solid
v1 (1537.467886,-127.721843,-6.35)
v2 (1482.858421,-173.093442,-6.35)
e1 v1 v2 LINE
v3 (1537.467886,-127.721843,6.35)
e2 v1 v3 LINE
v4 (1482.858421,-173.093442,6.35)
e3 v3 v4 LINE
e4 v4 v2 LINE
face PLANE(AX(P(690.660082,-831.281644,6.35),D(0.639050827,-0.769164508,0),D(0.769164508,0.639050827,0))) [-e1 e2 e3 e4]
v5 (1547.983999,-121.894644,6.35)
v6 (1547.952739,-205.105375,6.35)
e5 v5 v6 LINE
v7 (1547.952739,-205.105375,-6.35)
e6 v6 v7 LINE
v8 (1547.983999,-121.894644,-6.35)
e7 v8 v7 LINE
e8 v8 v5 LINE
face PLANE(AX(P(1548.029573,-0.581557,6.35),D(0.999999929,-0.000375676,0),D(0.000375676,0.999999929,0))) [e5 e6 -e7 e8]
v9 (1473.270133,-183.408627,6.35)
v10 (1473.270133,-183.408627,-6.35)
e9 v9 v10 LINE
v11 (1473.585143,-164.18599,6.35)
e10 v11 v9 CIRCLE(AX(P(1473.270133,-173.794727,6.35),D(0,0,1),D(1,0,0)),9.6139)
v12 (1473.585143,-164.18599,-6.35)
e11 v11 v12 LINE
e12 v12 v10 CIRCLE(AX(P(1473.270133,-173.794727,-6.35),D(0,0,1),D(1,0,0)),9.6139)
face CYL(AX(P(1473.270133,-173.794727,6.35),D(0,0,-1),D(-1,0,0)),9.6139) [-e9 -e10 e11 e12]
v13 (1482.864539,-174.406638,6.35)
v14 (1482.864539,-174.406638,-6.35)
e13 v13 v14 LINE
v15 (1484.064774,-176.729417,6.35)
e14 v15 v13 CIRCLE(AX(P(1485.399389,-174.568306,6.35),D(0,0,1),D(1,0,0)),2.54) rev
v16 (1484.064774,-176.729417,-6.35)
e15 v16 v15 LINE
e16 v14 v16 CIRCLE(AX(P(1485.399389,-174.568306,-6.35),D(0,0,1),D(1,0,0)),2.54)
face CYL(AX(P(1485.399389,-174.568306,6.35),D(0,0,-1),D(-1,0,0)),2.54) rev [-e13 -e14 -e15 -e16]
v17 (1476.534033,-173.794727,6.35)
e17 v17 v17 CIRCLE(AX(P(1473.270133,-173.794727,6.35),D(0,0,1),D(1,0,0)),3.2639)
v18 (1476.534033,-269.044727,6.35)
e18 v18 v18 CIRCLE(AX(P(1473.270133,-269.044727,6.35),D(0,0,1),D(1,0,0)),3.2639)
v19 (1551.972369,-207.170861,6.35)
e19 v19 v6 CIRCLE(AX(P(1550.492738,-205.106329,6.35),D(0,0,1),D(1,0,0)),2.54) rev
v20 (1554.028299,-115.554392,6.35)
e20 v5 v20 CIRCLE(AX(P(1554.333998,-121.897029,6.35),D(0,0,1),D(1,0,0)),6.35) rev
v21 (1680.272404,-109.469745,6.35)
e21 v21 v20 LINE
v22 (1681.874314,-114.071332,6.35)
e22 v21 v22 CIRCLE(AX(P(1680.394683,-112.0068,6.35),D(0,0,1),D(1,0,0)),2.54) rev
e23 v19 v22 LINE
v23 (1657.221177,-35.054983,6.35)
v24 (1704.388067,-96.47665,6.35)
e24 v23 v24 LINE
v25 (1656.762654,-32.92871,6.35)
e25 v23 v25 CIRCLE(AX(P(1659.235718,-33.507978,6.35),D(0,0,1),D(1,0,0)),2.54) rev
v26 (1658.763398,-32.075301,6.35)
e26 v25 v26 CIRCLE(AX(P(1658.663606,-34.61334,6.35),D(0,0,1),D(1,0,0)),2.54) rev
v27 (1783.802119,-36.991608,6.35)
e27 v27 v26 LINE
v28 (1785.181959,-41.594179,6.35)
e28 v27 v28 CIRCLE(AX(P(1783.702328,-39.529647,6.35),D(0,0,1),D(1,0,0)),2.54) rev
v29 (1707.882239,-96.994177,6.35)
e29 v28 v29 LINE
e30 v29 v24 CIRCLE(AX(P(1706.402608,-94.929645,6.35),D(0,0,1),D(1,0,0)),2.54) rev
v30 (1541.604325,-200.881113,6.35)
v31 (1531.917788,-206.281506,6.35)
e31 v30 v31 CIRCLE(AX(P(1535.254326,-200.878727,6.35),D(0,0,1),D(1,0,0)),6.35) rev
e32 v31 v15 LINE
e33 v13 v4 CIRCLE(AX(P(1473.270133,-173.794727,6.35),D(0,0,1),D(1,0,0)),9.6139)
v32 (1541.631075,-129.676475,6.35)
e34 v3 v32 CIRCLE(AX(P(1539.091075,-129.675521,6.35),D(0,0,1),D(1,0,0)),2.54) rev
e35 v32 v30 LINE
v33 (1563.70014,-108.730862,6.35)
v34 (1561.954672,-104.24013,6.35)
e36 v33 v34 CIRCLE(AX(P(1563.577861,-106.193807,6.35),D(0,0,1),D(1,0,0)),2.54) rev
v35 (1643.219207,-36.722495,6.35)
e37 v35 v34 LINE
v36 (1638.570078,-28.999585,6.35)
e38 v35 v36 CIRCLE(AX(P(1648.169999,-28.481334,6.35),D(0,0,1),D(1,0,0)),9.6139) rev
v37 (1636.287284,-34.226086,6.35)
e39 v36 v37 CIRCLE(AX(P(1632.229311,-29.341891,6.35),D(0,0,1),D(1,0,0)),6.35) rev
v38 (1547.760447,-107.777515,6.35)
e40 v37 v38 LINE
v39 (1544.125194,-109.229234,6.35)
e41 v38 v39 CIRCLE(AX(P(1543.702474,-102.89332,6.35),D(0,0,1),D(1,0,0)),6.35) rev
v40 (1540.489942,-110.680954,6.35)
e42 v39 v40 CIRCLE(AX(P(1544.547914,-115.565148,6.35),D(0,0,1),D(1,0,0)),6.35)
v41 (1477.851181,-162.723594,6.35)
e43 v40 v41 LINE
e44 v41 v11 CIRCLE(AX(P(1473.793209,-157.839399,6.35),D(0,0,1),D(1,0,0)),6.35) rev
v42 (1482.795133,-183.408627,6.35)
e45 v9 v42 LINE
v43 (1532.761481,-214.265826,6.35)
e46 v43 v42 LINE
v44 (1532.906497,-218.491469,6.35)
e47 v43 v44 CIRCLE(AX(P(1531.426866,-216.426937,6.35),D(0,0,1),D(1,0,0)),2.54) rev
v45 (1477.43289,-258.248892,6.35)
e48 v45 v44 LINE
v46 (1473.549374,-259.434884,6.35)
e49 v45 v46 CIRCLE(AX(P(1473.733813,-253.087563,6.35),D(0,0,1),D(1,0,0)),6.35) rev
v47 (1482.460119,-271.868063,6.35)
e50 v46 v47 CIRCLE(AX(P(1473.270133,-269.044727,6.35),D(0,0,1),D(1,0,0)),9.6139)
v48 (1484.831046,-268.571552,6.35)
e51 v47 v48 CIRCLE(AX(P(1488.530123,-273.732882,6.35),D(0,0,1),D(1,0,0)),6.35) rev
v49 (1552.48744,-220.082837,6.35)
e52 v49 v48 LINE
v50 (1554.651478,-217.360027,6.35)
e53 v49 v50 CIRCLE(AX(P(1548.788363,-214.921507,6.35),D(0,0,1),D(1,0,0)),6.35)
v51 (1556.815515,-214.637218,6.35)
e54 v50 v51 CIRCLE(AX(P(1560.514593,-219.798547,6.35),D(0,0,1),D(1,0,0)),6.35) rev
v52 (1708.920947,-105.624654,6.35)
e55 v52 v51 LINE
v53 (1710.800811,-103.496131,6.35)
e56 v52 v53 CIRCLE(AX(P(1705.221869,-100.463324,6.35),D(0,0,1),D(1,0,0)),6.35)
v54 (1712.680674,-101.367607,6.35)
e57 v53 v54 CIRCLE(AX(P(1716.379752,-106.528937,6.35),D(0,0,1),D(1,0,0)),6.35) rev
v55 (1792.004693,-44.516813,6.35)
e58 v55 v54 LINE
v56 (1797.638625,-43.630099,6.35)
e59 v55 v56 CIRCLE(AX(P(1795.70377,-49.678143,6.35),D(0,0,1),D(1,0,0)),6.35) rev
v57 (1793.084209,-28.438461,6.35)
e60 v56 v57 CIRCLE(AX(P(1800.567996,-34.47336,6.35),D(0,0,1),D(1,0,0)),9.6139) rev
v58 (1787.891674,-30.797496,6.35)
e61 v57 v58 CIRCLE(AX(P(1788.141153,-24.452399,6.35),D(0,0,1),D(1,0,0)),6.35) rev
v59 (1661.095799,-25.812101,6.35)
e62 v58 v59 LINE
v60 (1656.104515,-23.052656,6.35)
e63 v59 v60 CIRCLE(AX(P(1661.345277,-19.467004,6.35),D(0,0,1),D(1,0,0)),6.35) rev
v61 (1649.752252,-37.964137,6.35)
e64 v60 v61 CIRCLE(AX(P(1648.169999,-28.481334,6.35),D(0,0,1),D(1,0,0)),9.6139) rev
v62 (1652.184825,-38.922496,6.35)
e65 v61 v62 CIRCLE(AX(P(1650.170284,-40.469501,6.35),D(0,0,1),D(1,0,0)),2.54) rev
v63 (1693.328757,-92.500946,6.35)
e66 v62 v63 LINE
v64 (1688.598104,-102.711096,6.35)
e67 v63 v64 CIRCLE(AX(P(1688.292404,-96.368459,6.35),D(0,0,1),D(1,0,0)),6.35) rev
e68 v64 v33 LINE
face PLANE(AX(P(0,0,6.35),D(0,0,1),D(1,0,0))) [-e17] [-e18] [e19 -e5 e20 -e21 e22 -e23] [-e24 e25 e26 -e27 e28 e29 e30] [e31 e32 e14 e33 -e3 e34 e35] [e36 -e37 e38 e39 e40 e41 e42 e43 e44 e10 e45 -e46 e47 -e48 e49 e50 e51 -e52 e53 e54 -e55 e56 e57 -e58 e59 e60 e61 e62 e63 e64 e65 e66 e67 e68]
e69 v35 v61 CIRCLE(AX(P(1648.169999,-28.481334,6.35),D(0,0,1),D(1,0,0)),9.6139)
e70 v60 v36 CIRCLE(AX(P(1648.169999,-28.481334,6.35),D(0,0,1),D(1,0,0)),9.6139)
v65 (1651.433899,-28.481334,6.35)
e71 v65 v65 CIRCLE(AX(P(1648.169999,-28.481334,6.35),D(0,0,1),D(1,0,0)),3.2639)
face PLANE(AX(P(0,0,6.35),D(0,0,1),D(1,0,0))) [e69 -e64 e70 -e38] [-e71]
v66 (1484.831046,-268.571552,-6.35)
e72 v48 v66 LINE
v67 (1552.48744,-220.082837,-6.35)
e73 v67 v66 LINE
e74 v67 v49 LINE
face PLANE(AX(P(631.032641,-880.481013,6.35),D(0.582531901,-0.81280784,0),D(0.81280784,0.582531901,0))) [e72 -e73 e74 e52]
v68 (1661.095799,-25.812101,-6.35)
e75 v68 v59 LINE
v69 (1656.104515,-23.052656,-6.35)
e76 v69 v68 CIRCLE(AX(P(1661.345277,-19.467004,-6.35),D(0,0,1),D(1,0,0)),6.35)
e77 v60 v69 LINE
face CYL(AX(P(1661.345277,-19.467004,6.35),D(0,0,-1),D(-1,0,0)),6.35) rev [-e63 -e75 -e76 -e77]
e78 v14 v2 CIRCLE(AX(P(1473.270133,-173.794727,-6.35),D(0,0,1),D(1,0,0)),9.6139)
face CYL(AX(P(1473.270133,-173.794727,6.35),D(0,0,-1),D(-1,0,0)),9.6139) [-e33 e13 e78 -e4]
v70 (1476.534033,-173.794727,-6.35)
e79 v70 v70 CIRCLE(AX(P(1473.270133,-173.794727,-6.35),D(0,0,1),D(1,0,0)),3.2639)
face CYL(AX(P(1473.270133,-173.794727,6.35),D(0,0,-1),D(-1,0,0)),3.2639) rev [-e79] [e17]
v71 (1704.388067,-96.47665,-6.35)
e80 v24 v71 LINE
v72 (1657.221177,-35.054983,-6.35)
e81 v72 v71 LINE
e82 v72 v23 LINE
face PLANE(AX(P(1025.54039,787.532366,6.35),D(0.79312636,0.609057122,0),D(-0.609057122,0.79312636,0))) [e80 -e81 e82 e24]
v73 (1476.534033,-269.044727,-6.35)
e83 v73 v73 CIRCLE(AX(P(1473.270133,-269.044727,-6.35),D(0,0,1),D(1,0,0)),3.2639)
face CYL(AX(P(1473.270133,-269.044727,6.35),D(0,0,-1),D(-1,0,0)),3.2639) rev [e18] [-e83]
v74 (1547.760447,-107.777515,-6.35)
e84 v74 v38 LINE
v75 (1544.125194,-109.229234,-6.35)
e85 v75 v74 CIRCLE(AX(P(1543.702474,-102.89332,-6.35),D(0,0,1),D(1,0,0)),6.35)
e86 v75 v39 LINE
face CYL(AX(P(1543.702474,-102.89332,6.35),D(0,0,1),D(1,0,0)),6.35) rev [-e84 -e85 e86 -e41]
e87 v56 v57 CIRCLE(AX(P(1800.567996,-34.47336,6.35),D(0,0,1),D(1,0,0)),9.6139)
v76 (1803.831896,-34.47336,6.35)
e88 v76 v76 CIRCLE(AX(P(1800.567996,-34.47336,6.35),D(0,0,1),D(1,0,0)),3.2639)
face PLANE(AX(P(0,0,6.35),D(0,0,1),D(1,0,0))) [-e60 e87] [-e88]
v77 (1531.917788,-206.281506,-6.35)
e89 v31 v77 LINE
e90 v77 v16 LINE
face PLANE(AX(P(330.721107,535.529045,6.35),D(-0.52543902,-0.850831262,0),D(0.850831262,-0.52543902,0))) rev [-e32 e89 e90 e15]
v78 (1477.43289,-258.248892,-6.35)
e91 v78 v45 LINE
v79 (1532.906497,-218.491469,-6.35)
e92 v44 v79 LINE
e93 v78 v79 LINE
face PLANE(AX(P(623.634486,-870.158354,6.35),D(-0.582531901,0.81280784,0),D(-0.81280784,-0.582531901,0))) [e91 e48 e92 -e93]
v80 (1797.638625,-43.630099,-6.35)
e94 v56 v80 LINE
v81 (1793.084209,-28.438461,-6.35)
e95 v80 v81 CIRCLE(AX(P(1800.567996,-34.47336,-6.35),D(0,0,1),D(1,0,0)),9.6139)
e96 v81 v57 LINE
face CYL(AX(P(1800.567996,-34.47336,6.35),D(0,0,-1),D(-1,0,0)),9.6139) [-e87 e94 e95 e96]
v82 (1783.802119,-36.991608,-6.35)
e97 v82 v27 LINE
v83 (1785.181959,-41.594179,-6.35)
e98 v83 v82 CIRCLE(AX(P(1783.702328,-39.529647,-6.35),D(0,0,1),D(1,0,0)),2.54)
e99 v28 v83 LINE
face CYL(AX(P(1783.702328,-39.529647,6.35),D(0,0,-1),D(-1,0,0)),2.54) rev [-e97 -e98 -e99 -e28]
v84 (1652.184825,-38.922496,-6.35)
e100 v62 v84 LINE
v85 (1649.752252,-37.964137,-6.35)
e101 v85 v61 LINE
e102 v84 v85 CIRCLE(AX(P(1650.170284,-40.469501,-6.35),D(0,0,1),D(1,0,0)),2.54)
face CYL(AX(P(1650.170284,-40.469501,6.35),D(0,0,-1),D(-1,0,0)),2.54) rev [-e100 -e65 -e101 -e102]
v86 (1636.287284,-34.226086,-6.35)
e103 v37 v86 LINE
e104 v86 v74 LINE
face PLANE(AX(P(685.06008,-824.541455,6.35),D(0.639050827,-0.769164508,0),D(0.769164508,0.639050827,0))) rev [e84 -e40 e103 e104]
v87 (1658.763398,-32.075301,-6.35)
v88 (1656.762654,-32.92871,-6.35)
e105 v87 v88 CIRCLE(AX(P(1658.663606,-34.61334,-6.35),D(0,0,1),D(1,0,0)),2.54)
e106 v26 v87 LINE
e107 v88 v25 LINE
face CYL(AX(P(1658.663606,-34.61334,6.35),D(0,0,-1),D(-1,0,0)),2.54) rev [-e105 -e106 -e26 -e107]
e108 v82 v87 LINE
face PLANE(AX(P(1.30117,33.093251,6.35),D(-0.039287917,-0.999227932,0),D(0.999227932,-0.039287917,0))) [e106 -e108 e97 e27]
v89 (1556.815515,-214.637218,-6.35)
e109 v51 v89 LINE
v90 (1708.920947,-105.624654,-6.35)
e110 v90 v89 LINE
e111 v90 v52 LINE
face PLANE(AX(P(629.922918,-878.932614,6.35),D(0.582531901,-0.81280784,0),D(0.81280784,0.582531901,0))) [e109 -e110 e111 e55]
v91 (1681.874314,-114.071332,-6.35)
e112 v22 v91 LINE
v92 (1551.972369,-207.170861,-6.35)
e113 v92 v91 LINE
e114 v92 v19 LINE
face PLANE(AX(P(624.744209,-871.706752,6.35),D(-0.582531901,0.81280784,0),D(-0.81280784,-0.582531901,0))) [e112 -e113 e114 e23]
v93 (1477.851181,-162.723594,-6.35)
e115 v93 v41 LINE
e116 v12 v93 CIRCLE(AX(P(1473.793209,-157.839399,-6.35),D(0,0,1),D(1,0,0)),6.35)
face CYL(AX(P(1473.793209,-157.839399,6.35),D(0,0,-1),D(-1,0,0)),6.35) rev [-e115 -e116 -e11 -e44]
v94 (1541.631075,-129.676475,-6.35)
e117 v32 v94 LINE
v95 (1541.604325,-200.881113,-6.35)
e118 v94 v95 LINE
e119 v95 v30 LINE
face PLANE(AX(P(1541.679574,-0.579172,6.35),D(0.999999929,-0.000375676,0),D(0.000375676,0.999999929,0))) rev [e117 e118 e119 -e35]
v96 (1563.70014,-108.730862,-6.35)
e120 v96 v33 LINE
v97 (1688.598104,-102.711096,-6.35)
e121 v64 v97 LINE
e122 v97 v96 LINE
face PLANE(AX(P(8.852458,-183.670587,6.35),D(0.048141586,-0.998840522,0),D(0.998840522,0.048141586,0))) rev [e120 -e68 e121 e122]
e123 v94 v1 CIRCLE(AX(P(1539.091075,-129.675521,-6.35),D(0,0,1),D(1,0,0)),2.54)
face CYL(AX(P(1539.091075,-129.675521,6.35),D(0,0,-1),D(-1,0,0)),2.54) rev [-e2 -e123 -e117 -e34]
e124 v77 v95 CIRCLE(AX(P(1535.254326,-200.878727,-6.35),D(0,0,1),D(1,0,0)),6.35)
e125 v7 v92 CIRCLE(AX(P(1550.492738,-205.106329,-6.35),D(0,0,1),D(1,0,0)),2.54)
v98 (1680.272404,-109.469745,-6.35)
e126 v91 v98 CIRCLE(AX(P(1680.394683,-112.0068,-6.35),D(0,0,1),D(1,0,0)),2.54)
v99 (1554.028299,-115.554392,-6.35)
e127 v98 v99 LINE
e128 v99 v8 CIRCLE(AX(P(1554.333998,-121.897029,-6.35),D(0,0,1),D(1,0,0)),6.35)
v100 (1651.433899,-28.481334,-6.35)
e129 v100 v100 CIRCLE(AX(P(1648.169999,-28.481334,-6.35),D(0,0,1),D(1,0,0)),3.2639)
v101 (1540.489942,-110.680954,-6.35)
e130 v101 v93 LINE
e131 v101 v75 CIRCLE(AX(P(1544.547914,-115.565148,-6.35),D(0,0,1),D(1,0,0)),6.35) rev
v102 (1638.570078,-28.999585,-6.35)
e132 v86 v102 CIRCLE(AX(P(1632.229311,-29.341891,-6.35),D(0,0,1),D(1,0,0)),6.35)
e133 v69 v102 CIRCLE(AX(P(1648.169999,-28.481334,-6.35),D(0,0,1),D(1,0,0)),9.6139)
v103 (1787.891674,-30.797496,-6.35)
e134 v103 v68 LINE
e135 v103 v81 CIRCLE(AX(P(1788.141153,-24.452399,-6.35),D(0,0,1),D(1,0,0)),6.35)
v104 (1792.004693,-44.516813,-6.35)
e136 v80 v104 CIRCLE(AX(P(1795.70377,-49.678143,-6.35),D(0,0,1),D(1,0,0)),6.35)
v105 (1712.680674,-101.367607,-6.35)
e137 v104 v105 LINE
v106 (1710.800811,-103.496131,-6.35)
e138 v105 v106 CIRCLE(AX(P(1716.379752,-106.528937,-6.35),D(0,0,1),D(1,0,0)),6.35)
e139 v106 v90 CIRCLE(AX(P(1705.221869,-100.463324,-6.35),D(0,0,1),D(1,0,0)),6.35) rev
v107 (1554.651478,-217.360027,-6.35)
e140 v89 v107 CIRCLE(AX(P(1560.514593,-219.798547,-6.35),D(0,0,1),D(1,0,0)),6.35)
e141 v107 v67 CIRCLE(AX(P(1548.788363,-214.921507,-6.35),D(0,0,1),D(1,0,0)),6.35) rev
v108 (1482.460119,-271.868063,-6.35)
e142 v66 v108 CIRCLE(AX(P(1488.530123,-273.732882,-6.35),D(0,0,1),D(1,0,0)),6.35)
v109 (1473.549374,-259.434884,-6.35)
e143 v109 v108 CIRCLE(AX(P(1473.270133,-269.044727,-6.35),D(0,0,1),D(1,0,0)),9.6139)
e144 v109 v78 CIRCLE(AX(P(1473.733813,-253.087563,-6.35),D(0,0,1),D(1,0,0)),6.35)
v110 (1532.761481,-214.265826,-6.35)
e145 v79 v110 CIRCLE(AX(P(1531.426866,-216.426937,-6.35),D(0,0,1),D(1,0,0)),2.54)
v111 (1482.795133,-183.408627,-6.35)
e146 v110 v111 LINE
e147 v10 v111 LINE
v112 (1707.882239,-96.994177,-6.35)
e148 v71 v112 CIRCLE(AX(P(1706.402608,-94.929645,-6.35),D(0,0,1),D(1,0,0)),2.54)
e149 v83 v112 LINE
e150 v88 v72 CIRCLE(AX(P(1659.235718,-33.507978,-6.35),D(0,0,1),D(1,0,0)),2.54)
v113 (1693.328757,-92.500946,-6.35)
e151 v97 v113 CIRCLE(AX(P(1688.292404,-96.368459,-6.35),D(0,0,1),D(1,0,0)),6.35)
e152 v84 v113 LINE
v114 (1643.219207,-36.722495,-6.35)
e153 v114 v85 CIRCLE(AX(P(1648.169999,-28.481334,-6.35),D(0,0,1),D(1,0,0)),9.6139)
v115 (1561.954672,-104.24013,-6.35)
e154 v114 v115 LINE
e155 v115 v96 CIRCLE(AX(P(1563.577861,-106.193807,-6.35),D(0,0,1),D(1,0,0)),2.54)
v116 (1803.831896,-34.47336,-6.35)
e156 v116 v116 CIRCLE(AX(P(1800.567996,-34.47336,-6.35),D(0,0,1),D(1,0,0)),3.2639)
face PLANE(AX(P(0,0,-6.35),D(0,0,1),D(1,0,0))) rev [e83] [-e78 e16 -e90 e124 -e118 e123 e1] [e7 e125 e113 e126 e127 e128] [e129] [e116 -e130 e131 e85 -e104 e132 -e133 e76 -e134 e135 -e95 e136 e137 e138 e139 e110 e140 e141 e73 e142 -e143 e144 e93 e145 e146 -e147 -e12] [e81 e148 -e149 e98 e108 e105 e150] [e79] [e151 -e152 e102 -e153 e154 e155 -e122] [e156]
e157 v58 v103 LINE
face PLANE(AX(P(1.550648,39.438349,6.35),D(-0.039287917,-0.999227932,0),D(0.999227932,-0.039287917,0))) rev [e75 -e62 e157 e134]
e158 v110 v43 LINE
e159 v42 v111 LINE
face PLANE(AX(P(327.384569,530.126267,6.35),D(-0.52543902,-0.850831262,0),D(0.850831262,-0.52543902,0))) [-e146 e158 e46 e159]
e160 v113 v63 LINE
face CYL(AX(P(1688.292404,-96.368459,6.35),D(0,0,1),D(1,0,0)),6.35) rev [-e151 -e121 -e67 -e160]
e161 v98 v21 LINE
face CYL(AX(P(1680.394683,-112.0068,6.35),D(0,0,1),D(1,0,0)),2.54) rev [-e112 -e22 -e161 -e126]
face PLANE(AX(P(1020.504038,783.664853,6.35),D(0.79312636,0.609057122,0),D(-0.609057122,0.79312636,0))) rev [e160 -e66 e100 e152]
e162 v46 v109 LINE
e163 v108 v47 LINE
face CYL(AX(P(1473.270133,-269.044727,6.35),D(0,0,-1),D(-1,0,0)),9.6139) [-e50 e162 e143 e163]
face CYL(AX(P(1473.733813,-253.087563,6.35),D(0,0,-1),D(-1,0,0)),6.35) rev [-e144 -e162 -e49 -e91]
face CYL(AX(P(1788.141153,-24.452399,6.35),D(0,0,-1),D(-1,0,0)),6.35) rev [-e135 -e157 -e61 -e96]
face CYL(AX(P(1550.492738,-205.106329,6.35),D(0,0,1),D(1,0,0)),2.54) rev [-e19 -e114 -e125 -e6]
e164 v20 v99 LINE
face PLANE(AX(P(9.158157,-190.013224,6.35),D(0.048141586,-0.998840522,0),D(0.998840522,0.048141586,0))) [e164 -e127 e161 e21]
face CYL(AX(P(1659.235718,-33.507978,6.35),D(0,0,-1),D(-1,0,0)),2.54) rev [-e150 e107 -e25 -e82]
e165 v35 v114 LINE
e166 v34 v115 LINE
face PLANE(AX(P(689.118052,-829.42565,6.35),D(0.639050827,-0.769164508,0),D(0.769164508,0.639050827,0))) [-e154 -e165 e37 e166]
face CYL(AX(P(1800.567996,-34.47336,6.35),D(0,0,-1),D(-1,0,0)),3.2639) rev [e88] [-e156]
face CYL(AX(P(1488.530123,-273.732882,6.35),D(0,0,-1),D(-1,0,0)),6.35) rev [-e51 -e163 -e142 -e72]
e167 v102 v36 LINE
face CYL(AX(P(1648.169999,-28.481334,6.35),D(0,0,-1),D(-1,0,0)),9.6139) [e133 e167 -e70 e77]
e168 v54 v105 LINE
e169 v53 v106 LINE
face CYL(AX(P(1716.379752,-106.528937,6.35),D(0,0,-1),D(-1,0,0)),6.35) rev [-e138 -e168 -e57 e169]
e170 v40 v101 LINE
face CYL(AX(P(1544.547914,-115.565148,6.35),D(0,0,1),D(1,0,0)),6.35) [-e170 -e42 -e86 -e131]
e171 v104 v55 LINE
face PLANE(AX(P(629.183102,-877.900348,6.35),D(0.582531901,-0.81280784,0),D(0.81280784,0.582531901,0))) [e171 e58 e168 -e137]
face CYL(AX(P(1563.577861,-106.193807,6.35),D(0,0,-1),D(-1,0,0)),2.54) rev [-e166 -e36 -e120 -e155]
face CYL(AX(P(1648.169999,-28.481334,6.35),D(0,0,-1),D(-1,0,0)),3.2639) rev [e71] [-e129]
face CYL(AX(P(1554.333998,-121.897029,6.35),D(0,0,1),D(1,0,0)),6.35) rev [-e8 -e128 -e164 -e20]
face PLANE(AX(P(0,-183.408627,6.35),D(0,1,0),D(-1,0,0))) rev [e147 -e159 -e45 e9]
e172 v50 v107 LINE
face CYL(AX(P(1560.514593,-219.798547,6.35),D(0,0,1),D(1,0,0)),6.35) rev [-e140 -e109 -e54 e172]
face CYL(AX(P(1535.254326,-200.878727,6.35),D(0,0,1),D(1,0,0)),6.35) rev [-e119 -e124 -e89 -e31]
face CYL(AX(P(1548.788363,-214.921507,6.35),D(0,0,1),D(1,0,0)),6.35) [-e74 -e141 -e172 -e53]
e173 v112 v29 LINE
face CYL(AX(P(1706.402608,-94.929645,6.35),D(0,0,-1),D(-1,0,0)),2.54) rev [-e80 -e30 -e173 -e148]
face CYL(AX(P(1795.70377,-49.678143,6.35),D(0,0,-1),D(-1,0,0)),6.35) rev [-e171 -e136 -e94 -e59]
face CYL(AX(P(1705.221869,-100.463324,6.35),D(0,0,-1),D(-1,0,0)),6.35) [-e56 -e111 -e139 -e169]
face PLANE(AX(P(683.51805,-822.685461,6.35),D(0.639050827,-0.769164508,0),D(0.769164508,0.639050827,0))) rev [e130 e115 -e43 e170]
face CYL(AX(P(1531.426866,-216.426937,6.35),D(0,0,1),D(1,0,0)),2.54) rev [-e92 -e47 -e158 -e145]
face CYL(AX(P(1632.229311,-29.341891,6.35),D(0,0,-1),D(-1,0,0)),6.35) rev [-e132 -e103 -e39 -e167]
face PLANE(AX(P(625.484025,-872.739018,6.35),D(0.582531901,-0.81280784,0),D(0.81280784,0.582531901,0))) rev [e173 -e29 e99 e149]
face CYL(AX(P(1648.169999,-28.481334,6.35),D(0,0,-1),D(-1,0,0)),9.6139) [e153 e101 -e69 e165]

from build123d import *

# Parameters (mm, degrees)
SKETCH1_R           = 3.2639
BOSS_EXTRUDE1_DEPTH = 6.35
FILLET2_R           = 6.35
FILLET3_R           = 2.54
FILLET6_R           = 6.35
FILLET7_R           = 6.35


with BuildPart() as part:
    # Sketch1 → Boss-Extrude1 (new, symmetric)
    with BuildSketch(Plane.XY):
        with BuildLine():
            ThreePointArc((1657.362226857, -25.665303386), (1645.082138382, -19.376819434), (1639.161234094, -31.838299916))
            Line((1639.161234094, -31.838299916), (1543.928298612, -110.961407638))
            Line((1543.928298612, -110.961407638), (1542.386268966, -109.105413681))
            Line((1542.386268966, -109.105413681), (1475.716388889, -164.497259751))
            ThreePointArc((1475.716388889, -164.497259751), (1463.735668917, -172.561408735), (1473.270132637, -183.40862734))
            Line((1473.270132637, -183.40862734), (1482.795132637, -183.40862734))
            Line((1482.795132637, -183.40862734), (1536.006430236, -216.269775409))
            Line((1536.006430236, -216.269775409), (1475.438186342, -259.678478553))
            ThreePointArc((1475.438186342, -259.678478553), (1465.455879345, -274.64513078), (1482.83634148, -270.00113812))
            Line((1482.83634148, -270.00113812), (1554.239311773, -218.827286252))
            Line((1554.239311773, -218.827286252), (1553.129588502, -217.278887316))
            Line((1553.129588502, -217.278887316), (1710.323691942, -104.61931964))
            Line((1710.323691942, -104.61931964), (1709.583876428, -103.587053683))
            Line((1709.583876428, -103.587053683), (1795.041714347, -42.340207499))
            ThreePointArc((1795.041714347, -42.340207499), (1809.776954687, -31.712536315), (1791.625246623, -30.944293485))
            Line((1791.625246623, -30.944293485), (1657.362226857, -25.665303386))
        make_face()
        with BuildLine():
            Line((1700.720652168, -102.126820321), (1556.109252329, -109.096723899))
            Line((1556.109252329, -109.096723899), (1643.219206848, -36.72249454))
            ThreePointArc((1643.219206848, -36.72249454), (1647.101886478, -38.035715693), (1651.178708707, -37.612311142))
            Line((1651.178708707, -37.612311142), (1700.720652168, -102.126820321))
        make_face(mode=Mode.SUBTRACT)
        with BuildLine():
            ThreePointArc((1482.659265028, -175.861431519), (1482.859244436, -174.484660756), (1482.858420935, -173.093442291))
            Line((1482.858420935, -173.093442291), (1541.633109373, -124.261218638))
            Line((1541.633109373, -124.261218638), (1541.60005002, -212.260879574))
            Line((1541.60005002, -212.260879574), (1482.659265028, -175.861431519))
        make_face(mode=Mode.SUBTRACT)
        with Locations((1473.270132637, -269.04472734)):
            Circle(SKETCH1_R, mode=Mode.SUBTRACT)
        with Locations((1473.270132637, -173.79472734)):
            Circle(SKETCH1_R, mode=Mode.SUBTRACT)
        Polygon((1547.986271365, -115.845602263), (1688.873329523, -109.05520253), (1547.950879905, -210.053025619), align=None, mode=Mode.SUBTRACT)
        with Locations((1648.169999473, -28.481334088)):
            Circle(SKETCH1_R, mode=Mode.SUBTRACT)
        with BuildLine():
            Line((1705.884798859, -98.425723899), (1656.215061092, -33.744798419))
            ThreePointArc((1656.215061092, -33.744798419), (1656.708059099, -32.900452896), (1657.112748585, -32.010400752))
            Line((1657.112748585, -32.010400752), (1791.19818023, -37.282408394))
            Line((1791.19818023, -37.282408394), (1705.884798859, -98.425723899))
        make_face(mode=Mode.SUBTRACT)
        with Locations((1800.567995736, -34.473360149)):
            Circle(SKETCH1_R, mode=Mode.SUBTRACT)
    extrude(amount=BOSS_EXTRUDE1_DEPTH, both=True)

    # Fillet2
    fillet2_edges = [part.edges().sort_by_distance(p)[0] for p in [
        (1541.60005002, -212.260879574, 0),
        (1547.986271365, -115.845602263, 0),
        (1700.720652168, -102.126820321, 0),
        (1791.625246623, -30.944293485, 0),
        (1795.041714347, -42.340207499, 0),
        (1482.83634148, -270.00113812, 0),
        (1475.438186342, -259.678478553, 0),
        (1475.716388889, -164.497259751, 0),
        (1639.161234094, -31.838299916, 0),
        (1657.362226857, -25.665303386, 0),
    ]]
    fillet(fillet2_edges, radius=FILLET2_R)

    # Fillet3
    # the kernel refuses this fillet: 2.54 mm, written as the material it adds along each edge
    with BuildSketch(Plane(origin=(1482.659265028, -175.861431519, -6.35), x_dir=(0.8508312617816599, -0.5254390202250196, 0), z_dir=(0, 0, 1)), Plane(origin=(1656.215061092, -33.744798419, -6.35), x_dir=(0.6090571217254737, -0.7931263597154502, 0), z_dir=(0, 0, 1))) as fillet3_piece_1:
        with BuildLine():
            CenterArc((1.651924419, 2.54), FILLET3_R, 208.048541525, 61.951458475)
            ThreePointArc((-0.5897514, 1.345642633), (-0.269132792, 0.684103596), (0, 0))
            Line((0, 0), (1.651924419, 0))
        make_face()
    extrude(amount=12.7)
    with BuildSketch(Plane(origin=(1541.633109373, -124.261218638, -6.35), x_dir=(-0.00037567588921249087, -0.9999999294338106, 0), z_dir=(0, 0, 1))) as fillet3_piece_2:
        with BuildLine():
            CenterArc((FILLET3_R * 2.13199085195, -FILLET3_R), FILLET3_R, 90, 129.742603087)
            Line((FILLET3_R * 1.36306647439, -FILLET3_R * 1.63933973879), (0, 0))
            Line((0, 0), (FILLET3_R * 2.13199085195, 0))
        make_face()
    extrude(amount=12.7)
    with BuildSketch(Plane(origin=(1547.950879905, -210.053025619, 6.35), x_dir=(0.8128078399508512, 0.5825319006839296, 0), z_dir=(0, 0, -1))) as fillet3_piece_3:
        with BuildLine():
            CenterArc((FILLET3_R * 1.94789411365, -FILLET3_R), FILLET3_R, 90, 125.650345443)
            Line((FILLET3_R * 1.13530517425, -FILLET3_R * 1.58283721188), (0, 0))
            Line((0, 0), (FILLET3_R * 1.94789411365, 0))
        make_face()
    extrude(amount=12.7)
    with BuildSketch(Plane(origin=(1688.873329523, -109.05520253, -6.35), x_dir=(-0.9988405216590461, -0.04814158588875568, 0), z_dir=(0, 0, 1))) as fillet3_piece_4:
        with BuildLine():
            CenterArc((FILLET3_R * 3.39012199782, FILLET3_R), FILLET3_R, 122.869444547, 147.130555453)
            Line((FILLET3_R * 2.8473953887, FILLET3_R * 1.83990941639), (0, 0))
            Line((0, 0), (FILLET3_R * 3.39012199782, 0))
        make_face()
    extrude(amount=12.7)
    with BuildSketch(Plane(origin=(1705.884798859, -98.425723899, -6.35), x_dir=(-0.6090571217254714, 0.7931263597154518, 0), z_dir=(0, 0, 1))) as fillet3_piece_5:
        with BuildLine():
            CenterArc((FILLET3_R * 0.967502749894, -FILLET3_R), FILLET3_R, 90, 88.10746289)
            Line((-FILLET3_R * 0.0319517760986, -FILLET3_R * 0.966975002291), (0, 0))
            Line((0, 0), (FILLET3_R * 0.967502749894, 0))
        make_face()
    extrude(amount=12.7)
    with BuildSketch(Plane(origin=(1791.19818023, -37.282408394, 6.35), x_dir=(-0.9992279317494432, 0.03928791686676534, 0), z_dir=(0, 0, -1))) as fillet3_piece_6:
        with BuildLine():
            CenterArc((FILLET3_R * 2.91408494962, -FILLET3_R), FILLET3_R, 90, 142.119567883)
            Line((FILLET3_R * 2.30006927648, -FILLET3_R * 1.78929383194), (0, 0))
            Line((0, 0), (FILLET3_R * 2.91408494962, 0))
        make_face()
    extrude(amount=12.7)
    with BuildSketch(Plane(origin=(1657.112748585, -32.010400752, -6.35), x_dir=(-0.4370826010652276, -0.8994213694626424, 0), z_dir=(0, 0, 1))) as fillet3_piece_7:
        with BuildLine():
            CenterArc((1.663286591, 2.532574185), FILLET3_R, 203.666275918, 61.951458475)
            Line((-0.663096919, 1.512995956), (0, 0))
            ThreePointArc((0, 0), (0.734602071, 0.02810671), (1.469204142, 0))
        make_face()
    extrude(amount=12.7)
    with BuildSketch(Plane(origin=(1556.109252329, -109.096723899, 6.35), x_dir=(0.9988405216590459, 0.048141585888763216, 0), z_dir=(0, 0, -1))) as fillet3_piece_8:
        with BuildLine():
            CenterArc((FILLET3_R * 2.99200774925, -FILLET3_R), FILLET3_R, 90, 143.038297809)
            Line((FILLET3_R * 2.39072668673, -FILLET3_R * 1.79903759853), (0, 0))
            Line((0, 0), (FILLET3_R * 2.99200774925, 0))
        make_face()
    extrude(amount=12.7)
    with BuildSketch(Plane(origin=(1651.178708707, -37.612311142, -6.35), x_dir=(0.6090571217254943, -0.7931263597154341, 0), z_dir=(0, 0, 1))) as fillet3_piece_9:
        with BuildLine():
            CenterArc((1.651924419, -2.54), FILLET3_R, 90, 61.951458475)
            ThreePointArc((-0.5897514, -1.345642633), (-0.269132792, -0.684103596), (0, 0))
            Line((0, 0), (1.651924419, 0))
        make_face()
    extrude(amount=12.7)
    with BuildSketch(Plane(origin=(1536.006430236, -216.269775409, -6.35), x_dir=(-0.8508312617816903, 0.5254390202249702, 0), z_dir=(0, 0, 1))) as fillet3_piece_10:
        with BuildLine():
            CenterArc((FILLET3_R * 1.50151874055, FILLET3_R), FILLET3_R, 157.326623381, 112.673376619)
            Line((FILLET3_R * 0.578801433411, FILLET3_R * 1.38547732891), (0, 0))
            Line((0, 0), (FILLET3_R * 1.50151874055, 0))
        make_face()
    extrude(amount=12.7)

    # Fillet6
    # the kernel refuses this fillet: 6.35 mm, written as the material it adds along each edge
    with BuildSketch(Plane(origin=(1543.928298612, -110.961407638, -6.35), x_dir=(-0.6390508273261215, 0.7691645078224811, 0), z_dir=(0, 0, 1))) as fillet6_piece_1:
        with BuildLine():
            CenterArc((6.35, -4.982221492), FILLET6_R, 128.316134474, 51.683865526)
            Line((0, -4.982221492), (-0.127, -4.982221492))
            Line((-0.127, -4.982221492), (-0.127, 0))
            Line((-0.127, 0), (0, 0.127))
            ThreePointArc((0, 0.127), (1.2065, 0.127), (2.33426, 0.09964443))
            Line((2.33426, 0.09964443), (2.413, 0))
        make_face()
    extrude(amount=12.7)
    with BuildSketch(Plane(origin=(1709.583876428, -103.587053683, 6.35), x_dir=(0.8128078399508694, 0.582531900683904, 0), z_dir=(0, 0, -1))) as fillet6_piece_2:
        with BuildLine():
            CenterArc((3.81, 6.35), FILLET6_R, 233.130102354, 36.869897646)
            Line((0, 1.27), (-0.0762, 1.1684))
            ThreePointArc((-0.0762, 1.1684), (-0.127, 0.635), (-0.127, 0))
            Line((-0.127, 0), (0, -0.127))
            Line((0, -0.127), (3.81, -0.127))
            Line((3.81, -0.127), (3.81, 0))
        make_face()
    extrude(amount=12.7)
    with BuildSketch(Plane(origin=(1553.129588502, -217.278887316, -6.35), x_dir=(0.8128078399508519, 0.5825319006839285, 0), z_dir=(0, 0, 1))) as fillet6_piece_3:
        with BuildLine():
            CenterArc((4.534807052, -6.35), FILLET6_R, 90, 45.572995999)
            Line((0, -1.905), (-0.090696141, -1.8161))
            ThreePointArc((-0.090696141, -1.8161), (-0.127, -0.9525), (-0.127, 0))
            Line((-0.127, 0), (0, 0.127))
            Line((0, 0.127), (4.534807052, 0.127))
            Line((4.534807052, 0.127), (4.534807052, 0))
        make_face()
    extrude(amount=12.7)

    # Fillet7
    fillet7_edges = [part.edges().sort_by_distance(p)[0] for p in [
        (1710.323691942, -104.61931964, 0),
        (1554.239311773, -218.827286252, 0),
        (1542.386268966, -109.105413681, 0),
    ]]
    fillet(fillet7_edges, radius=FILLET7_R)


solid = part.part
